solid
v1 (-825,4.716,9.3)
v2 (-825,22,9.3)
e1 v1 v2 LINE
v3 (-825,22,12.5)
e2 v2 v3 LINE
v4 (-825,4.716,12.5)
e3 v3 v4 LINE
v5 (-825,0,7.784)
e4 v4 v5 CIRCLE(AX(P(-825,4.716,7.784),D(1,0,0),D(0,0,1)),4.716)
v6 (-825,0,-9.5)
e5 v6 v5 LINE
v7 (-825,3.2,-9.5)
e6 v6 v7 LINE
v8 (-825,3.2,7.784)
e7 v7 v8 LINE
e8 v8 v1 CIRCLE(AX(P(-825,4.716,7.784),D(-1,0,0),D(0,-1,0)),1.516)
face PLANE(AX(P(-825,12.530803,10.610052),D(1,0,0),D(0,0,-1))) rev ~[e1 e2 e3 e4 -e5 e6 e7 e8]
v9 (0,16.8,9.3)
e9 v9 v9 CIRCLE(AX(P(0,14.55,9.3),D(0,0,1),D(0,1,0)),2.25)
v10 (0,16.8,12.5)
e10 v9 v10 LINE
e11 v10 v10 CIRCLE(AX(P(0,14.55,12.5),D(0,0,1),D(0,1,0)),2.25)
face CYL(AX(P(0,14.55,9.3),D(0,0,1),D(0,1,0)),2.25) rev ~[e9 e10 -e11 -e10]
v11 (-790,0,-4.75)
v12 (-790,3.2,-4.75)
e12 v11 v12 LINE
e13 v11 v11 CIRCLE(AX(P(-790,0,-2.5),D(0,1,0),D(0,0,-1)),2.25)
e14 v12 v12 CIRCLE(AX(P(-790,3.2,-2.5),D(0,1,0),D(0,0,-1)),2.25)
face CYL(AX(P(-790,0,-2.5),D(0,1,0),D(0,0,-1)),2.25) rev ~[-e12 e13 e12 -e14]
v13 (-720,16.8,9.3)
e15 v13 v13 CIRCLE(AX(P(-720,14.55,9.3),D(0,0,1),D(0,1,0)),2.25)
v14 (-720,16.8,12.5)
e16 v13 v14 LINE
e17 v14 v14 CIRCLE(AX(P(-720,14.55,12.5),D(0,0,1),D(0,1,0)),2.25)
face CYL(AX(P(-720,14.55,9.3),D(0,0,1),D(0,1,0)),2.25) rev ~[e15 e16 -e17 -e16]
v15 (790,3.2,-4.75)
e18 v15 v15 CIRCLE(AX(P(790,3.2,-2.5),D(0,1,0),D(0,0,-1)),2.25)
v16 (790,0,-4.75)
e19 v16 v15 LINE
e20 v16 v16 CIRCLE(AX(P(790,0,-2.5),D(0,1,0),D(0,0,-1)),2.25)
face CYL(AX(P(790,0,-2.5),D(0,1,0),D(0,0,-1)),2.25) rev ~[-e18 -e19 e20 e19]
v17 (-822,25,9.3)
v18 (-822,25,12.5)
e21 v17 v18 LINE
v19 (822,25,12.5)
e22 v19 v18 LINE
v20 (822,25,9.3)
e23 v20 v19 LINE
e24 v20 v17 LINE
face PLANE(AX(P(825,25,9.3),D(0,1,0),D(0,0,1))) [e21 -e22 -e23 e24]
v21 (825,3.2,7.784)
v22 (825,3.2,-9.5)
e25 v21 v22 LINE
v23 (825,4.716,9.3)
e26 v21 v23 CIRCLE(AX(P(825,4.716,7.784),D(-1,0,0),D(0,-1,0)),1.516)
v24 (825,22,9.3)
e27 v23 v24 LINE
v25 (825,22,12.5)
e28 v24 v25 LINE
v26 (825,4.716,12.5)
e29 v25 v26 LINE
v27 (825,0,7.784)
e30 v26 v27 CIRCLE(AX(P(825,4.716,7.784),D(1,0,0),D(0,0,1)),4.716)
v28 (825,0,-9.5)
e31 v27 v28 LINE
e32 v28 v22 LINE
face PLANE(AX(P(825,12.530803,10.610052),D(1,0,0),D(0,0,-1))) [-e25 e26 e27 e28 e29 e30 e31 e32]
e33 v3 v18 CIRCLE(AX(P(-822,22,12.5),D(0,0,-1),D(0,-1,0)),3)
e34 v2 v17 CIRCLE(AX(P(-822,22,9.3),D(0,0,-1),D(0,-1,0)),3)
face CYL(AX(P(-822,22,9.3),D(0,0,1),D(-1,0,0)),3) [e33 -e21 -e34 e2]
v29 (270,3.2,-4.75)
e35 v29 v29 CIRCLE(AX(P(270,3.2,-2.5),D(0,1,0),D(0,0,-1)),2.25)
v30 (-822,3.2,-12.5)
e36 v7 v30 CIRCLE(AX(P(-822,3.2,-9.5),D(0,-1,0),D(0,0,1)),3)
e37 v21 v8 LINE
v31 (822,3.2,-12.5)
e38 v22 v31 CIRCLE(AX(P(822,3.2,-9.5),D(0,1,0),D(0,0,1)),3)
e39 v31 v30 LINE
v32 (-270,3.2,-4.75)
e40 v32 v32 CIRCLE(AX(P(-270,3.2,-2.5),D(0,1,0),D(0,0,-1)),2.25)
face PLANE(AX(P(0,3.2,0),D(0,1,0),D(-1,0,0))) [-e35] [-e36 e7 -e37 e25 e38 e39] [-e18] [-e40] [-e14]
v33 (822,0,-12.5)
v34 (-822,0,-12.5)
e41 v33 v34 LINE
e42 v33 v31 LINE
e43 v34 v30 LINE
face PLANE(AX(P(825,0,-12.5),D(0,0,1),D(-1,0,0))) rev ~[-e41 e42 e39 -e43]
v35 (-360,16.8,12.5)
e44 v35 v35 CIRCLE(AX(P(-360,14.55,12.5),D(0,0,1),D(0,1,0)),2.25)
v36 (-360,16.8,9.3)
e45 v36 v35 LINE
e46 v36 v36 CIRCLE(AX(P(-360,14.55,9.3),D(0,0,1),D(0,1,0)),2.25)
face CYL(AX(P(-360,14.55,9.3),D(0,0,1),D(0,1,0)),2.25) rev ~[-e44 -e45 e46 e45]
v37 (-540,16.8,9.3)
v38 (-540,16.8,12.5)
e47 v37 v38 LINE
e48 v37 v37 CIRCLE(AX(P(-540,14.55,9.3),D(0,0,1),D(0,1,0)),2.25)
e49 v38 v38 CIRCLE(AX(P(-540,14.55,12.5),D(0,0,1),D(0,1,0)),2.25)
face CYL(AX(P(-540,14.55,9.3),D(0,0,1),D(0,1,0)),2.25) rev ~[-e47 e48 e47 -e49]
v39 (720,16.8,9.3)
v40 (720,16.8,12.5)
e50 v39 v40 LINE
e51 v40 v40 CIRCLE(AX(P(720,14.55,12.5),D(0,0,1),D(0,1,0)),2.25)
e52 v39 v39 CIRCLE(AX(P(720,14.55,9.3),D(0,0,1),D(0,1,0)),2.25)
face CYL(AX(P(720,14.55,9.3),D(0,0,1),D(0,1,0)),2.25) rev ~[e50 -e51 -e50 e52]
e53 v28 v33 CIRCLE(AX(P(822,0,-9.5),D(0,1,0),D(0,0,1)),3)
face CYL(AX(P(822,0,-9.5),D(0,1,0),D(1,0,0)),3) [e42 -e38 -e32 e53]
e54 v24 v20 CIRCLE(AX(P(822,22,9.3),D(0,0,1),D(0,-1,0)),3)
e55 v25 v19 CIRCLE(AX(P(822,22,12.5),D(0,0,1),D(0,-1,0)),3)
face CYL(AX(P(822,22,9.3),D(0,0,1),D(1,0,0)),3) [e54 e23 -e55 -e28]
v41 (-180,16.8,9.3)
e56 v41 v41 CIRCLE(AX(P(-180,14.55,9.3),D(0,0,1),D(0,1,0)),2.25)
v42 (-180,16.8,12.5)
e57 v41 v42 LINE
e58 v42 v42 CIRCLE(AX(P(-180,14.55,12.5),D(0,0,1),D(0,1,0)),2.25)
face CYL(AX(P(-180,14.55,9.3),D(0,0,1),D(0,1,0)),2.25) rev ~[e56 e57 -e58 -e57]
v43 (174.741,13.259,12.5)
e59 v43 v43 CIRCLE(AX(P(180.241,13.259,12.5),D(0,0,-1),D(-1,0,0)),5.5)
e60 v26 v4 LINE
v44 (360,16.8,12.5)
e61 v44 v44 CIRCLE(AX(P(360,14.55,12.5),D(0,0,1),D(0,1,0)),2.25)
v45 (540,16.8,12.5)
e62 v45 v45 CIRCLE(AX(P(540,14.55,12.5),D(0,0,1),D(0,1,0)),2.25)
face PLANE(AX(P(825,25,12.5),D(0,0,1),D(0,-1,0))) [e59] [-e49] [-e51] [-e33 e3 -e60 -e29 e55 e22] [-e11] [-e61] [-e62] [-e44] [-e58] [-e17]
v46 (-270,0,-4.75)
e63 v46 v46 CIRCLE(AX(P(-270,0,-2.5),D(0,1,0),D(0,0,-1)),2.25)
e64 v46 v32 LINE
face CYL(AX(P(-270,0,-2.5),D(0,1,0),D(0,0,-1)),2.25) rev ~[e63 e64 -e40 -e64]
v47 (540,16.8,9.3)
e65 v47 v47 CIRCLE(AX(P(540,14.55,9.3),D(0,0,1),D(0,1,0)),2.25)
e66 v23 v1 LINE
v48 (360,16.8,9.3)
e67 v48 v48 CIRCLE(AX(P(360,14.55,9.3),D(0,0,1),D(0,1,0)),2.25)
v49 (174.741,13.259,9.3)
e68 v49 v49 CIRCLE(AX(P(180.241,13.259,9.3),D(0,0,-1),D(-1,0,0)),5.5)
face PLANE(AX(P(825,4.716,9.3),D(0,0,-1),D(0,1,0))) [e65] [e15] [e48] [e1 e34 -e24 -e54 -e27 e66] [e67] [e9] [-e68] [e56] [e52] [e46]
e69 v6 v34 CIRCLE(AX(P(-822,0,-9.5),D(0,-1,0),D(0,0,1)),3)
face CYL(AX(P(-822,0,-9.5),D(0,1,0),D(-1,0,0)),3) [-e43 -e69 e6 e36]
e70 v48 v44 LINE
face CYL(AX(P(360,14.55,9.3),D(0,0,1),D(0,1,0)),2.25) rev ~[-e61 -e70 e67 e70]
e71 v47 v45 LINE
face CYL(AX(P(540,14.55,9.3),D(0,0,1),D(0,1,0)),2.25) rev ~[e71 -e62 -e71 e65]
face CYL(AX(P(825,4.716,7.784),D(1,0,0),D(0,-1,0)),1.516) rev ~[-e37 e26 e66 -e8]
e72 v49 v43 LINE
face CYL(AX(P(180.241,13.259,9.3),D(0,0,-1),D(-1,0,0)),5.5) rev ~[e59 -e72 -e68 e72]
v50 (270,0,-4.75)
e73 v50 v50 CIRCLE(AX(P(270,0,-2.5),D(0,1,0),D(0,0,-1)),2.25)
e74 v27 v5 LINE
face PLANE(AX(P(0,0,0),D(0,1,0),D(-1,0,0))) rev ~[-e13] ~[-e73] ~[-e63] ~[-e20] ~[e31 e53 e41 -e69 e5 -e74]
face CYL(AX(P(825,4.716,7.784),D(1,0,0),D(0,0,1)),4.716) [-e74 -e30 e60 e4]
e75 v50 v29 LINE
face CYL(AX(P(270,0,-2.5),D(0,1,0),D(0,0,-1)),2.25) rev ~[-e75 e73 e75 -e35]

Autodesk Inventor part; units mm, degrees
ref_plane "YZ Plane" through (0, 0, 0) normal (1, 0, 0) x (0, 1, 0)
ref_plane "XZ Plane" through (0, 0, 0) normal (0, 1, 0) x (-1, 0, 0)
ref_plane "XY Plane" through (0, 0, 0) normal (0, 0, 1) x (1, 0, 0)
sketch "Sketch1" plane through (0, 0, 0) normal (0, 1, 0) x (-1, 0, 0)
  line L0 (825, 12.5) -> (-825, 12.5)
  line L1 (-825, 12.5) -> (-825, -12.5)
  line L2 (-825, -12.5) -> (825, -12.5)
  line L3 (825, -12.5) -> (825, 12.5)
  line L4 (825, 12.5) -> (-825, -12.5) construction
  line L5 (-825, 12.5) -> (825, -12.5) construction
  point P0 (0, 0)
  dimension "d0" = 1650
  dimension "d1" = 25
extrude "Plate1" add sketch "Sketch1" along normal blind 3.2
sketch "Sketch2" plane through (825, 0, 9.3) normal (0, 0, 1) x (1, 0, 0)
  line L0 (-1650, 0) -> (0, 0)
  line L1 (0, 0) -> (0, 25)
  line L2 (0, 25) -> (-1650, 25)
  line L3 (-1650, 25) -> (-1650, 0)
edge flange "Flange1" height 25 angle 90 thickness 3.2 bend radius 1.516 thickness toward (0, 0, 1) relief tear relief width 3.2 relief depth 1.6 edges at (0, 3.2, 12.5) wall of the first edge with corners at (-825, 0, 9.3) (825, 0, 9.3) (825, 25, 9.3) (-825, 25, 9.3)
bend "Bend1"
corner "Corner1"
sketch "Sketch3" plane through (825, 25, 9.3) normal (0, 0, -1) x (-1, 0, 0)
  circle A0 centre (105, -10.45) radius 1.5706 projected
  circle A1 centre (285, -10.45) radius 1.5706 projected
  circle A2 centre (465, -10.45) radius 1.5706 projected
  circle A3 centre (825, -10.45) radius 1.5706 projected
  circle A4 centre (1005, -10.45) radius 1.5706 projected
  circle A5 centre (1185, -10.45) radius 1.5706 projected
  circle A6 centre (1365, -10.45) radius 1.5706 projected
  circle A7 centre (1545, -10.45) radius 1.5706 projected
  point P0 (825, -25)
hole "Hole1" at (540, 14.55, 9.3) at (720, 14.55, 9.3) at (360, 14.55, 9.3) at (0, 14.55, 9.3) at (-180, 14.55, 9.3) at (-360, 14.55, 9.3) at (-540, 14.55, 9.3) at (-720, 14.55, 9.3) direction (0, 0, 1) diameter 4.5 depth 3.2 tip angle 118 clearance for "Countersunk Flat Head Screw ISO 2009/7046" size "M4" standard "ISO"
sketch "Sketch8" plane through (0, 0, 0) normal (0, -1, 0) x (1, 0, 0)
  line L0 (-825, -12.5) -> (825, -12.5) projected
  line L1 (0, -12.5) -> (0, -2.5)
  line L2 (0, -2.5) -> (-270, -2.5)
  line L3 (-270, -2.5) -> (-790, -2.5)
  line L4 (0, -2.5) -> (270, -2.5)
  line L5 (270, -2.5) -> (790, -2.5)
  point P0 (0, 0)
  dimension "d40" = 10
  dimension "d41" = 270
  dimension "d42" = 520
  dimension "d43" = 180
hole "Hole2" at (-790, 0, -2.5) at (-270, 0, -2.5) at (270, 0, -2.5) at (790, 0, -2.5) direction (0, 1, 0) diameter 4.5 depth 3.2 tip angle 118 clearance for "Countersunk Flat Head Screw ISO 2009/7046" size "M4" standard "ISO"
fillet "Corner Round1" radius 3 4 edges at (825, 1.6, -12.5) (-825, 25, 10.9) (825, 25, 10.9) (-825, 1.6, -12.5)
sketch "Sketch9" plane through (825, 4.716, 9.3) normal (0, 0, -1) x (-1, 0, 0)
  circle A0 centre (644.759, 8.543) radius 2.5 projected
  circle A1 centre (644.759, 8.543) radius 5.5
  point P0 (825, -4.716)
  dimension "d45" = 11
extrude "Cut3" cut sketch "Sketch9" against normal blind 3.2 contours A0 | A1
equation "\"d18\" = Thickness"
equation "\"d37\" = Thickness"
equation "\"d46\" = Thickness"
equation "\"d2\" = Thickness"
equation "\"d3\" = BendReliefWidth"
equation "\"d4\" = BendReliefDepth"
equation "\"d5\" = MinimumRemnant"
equation "\"d6\" = TransitionRadius"
equation "\"d9\" = BendRadius"
equation "\"d10\" = CornerReliefSize"
equation "\"d11\" = GapSize"
equation "\"d12\" = JacobiRadiusSize"
equation "\"BendReliefWidth\" = Thickness"
equation "\"BendReliefDepth\" = 0.5 * Thickness"
equation "\"CornerReliefSize\" = 4 * Thickness"
equation "\"MinimumRemnant\" = 2 * Thickness"
equation "\"TransitionRadius\" = BendRadius"
equation "\"JacobiRadiusSize\" = BendRadius"
equation "\"GapSize\" = Thickness"
equation "\"Thickness\" = 3.2"
equation "\"BendRadius\" = 1.516"
properties part number "SP47V1 Chapa Acrilico Pasador"
